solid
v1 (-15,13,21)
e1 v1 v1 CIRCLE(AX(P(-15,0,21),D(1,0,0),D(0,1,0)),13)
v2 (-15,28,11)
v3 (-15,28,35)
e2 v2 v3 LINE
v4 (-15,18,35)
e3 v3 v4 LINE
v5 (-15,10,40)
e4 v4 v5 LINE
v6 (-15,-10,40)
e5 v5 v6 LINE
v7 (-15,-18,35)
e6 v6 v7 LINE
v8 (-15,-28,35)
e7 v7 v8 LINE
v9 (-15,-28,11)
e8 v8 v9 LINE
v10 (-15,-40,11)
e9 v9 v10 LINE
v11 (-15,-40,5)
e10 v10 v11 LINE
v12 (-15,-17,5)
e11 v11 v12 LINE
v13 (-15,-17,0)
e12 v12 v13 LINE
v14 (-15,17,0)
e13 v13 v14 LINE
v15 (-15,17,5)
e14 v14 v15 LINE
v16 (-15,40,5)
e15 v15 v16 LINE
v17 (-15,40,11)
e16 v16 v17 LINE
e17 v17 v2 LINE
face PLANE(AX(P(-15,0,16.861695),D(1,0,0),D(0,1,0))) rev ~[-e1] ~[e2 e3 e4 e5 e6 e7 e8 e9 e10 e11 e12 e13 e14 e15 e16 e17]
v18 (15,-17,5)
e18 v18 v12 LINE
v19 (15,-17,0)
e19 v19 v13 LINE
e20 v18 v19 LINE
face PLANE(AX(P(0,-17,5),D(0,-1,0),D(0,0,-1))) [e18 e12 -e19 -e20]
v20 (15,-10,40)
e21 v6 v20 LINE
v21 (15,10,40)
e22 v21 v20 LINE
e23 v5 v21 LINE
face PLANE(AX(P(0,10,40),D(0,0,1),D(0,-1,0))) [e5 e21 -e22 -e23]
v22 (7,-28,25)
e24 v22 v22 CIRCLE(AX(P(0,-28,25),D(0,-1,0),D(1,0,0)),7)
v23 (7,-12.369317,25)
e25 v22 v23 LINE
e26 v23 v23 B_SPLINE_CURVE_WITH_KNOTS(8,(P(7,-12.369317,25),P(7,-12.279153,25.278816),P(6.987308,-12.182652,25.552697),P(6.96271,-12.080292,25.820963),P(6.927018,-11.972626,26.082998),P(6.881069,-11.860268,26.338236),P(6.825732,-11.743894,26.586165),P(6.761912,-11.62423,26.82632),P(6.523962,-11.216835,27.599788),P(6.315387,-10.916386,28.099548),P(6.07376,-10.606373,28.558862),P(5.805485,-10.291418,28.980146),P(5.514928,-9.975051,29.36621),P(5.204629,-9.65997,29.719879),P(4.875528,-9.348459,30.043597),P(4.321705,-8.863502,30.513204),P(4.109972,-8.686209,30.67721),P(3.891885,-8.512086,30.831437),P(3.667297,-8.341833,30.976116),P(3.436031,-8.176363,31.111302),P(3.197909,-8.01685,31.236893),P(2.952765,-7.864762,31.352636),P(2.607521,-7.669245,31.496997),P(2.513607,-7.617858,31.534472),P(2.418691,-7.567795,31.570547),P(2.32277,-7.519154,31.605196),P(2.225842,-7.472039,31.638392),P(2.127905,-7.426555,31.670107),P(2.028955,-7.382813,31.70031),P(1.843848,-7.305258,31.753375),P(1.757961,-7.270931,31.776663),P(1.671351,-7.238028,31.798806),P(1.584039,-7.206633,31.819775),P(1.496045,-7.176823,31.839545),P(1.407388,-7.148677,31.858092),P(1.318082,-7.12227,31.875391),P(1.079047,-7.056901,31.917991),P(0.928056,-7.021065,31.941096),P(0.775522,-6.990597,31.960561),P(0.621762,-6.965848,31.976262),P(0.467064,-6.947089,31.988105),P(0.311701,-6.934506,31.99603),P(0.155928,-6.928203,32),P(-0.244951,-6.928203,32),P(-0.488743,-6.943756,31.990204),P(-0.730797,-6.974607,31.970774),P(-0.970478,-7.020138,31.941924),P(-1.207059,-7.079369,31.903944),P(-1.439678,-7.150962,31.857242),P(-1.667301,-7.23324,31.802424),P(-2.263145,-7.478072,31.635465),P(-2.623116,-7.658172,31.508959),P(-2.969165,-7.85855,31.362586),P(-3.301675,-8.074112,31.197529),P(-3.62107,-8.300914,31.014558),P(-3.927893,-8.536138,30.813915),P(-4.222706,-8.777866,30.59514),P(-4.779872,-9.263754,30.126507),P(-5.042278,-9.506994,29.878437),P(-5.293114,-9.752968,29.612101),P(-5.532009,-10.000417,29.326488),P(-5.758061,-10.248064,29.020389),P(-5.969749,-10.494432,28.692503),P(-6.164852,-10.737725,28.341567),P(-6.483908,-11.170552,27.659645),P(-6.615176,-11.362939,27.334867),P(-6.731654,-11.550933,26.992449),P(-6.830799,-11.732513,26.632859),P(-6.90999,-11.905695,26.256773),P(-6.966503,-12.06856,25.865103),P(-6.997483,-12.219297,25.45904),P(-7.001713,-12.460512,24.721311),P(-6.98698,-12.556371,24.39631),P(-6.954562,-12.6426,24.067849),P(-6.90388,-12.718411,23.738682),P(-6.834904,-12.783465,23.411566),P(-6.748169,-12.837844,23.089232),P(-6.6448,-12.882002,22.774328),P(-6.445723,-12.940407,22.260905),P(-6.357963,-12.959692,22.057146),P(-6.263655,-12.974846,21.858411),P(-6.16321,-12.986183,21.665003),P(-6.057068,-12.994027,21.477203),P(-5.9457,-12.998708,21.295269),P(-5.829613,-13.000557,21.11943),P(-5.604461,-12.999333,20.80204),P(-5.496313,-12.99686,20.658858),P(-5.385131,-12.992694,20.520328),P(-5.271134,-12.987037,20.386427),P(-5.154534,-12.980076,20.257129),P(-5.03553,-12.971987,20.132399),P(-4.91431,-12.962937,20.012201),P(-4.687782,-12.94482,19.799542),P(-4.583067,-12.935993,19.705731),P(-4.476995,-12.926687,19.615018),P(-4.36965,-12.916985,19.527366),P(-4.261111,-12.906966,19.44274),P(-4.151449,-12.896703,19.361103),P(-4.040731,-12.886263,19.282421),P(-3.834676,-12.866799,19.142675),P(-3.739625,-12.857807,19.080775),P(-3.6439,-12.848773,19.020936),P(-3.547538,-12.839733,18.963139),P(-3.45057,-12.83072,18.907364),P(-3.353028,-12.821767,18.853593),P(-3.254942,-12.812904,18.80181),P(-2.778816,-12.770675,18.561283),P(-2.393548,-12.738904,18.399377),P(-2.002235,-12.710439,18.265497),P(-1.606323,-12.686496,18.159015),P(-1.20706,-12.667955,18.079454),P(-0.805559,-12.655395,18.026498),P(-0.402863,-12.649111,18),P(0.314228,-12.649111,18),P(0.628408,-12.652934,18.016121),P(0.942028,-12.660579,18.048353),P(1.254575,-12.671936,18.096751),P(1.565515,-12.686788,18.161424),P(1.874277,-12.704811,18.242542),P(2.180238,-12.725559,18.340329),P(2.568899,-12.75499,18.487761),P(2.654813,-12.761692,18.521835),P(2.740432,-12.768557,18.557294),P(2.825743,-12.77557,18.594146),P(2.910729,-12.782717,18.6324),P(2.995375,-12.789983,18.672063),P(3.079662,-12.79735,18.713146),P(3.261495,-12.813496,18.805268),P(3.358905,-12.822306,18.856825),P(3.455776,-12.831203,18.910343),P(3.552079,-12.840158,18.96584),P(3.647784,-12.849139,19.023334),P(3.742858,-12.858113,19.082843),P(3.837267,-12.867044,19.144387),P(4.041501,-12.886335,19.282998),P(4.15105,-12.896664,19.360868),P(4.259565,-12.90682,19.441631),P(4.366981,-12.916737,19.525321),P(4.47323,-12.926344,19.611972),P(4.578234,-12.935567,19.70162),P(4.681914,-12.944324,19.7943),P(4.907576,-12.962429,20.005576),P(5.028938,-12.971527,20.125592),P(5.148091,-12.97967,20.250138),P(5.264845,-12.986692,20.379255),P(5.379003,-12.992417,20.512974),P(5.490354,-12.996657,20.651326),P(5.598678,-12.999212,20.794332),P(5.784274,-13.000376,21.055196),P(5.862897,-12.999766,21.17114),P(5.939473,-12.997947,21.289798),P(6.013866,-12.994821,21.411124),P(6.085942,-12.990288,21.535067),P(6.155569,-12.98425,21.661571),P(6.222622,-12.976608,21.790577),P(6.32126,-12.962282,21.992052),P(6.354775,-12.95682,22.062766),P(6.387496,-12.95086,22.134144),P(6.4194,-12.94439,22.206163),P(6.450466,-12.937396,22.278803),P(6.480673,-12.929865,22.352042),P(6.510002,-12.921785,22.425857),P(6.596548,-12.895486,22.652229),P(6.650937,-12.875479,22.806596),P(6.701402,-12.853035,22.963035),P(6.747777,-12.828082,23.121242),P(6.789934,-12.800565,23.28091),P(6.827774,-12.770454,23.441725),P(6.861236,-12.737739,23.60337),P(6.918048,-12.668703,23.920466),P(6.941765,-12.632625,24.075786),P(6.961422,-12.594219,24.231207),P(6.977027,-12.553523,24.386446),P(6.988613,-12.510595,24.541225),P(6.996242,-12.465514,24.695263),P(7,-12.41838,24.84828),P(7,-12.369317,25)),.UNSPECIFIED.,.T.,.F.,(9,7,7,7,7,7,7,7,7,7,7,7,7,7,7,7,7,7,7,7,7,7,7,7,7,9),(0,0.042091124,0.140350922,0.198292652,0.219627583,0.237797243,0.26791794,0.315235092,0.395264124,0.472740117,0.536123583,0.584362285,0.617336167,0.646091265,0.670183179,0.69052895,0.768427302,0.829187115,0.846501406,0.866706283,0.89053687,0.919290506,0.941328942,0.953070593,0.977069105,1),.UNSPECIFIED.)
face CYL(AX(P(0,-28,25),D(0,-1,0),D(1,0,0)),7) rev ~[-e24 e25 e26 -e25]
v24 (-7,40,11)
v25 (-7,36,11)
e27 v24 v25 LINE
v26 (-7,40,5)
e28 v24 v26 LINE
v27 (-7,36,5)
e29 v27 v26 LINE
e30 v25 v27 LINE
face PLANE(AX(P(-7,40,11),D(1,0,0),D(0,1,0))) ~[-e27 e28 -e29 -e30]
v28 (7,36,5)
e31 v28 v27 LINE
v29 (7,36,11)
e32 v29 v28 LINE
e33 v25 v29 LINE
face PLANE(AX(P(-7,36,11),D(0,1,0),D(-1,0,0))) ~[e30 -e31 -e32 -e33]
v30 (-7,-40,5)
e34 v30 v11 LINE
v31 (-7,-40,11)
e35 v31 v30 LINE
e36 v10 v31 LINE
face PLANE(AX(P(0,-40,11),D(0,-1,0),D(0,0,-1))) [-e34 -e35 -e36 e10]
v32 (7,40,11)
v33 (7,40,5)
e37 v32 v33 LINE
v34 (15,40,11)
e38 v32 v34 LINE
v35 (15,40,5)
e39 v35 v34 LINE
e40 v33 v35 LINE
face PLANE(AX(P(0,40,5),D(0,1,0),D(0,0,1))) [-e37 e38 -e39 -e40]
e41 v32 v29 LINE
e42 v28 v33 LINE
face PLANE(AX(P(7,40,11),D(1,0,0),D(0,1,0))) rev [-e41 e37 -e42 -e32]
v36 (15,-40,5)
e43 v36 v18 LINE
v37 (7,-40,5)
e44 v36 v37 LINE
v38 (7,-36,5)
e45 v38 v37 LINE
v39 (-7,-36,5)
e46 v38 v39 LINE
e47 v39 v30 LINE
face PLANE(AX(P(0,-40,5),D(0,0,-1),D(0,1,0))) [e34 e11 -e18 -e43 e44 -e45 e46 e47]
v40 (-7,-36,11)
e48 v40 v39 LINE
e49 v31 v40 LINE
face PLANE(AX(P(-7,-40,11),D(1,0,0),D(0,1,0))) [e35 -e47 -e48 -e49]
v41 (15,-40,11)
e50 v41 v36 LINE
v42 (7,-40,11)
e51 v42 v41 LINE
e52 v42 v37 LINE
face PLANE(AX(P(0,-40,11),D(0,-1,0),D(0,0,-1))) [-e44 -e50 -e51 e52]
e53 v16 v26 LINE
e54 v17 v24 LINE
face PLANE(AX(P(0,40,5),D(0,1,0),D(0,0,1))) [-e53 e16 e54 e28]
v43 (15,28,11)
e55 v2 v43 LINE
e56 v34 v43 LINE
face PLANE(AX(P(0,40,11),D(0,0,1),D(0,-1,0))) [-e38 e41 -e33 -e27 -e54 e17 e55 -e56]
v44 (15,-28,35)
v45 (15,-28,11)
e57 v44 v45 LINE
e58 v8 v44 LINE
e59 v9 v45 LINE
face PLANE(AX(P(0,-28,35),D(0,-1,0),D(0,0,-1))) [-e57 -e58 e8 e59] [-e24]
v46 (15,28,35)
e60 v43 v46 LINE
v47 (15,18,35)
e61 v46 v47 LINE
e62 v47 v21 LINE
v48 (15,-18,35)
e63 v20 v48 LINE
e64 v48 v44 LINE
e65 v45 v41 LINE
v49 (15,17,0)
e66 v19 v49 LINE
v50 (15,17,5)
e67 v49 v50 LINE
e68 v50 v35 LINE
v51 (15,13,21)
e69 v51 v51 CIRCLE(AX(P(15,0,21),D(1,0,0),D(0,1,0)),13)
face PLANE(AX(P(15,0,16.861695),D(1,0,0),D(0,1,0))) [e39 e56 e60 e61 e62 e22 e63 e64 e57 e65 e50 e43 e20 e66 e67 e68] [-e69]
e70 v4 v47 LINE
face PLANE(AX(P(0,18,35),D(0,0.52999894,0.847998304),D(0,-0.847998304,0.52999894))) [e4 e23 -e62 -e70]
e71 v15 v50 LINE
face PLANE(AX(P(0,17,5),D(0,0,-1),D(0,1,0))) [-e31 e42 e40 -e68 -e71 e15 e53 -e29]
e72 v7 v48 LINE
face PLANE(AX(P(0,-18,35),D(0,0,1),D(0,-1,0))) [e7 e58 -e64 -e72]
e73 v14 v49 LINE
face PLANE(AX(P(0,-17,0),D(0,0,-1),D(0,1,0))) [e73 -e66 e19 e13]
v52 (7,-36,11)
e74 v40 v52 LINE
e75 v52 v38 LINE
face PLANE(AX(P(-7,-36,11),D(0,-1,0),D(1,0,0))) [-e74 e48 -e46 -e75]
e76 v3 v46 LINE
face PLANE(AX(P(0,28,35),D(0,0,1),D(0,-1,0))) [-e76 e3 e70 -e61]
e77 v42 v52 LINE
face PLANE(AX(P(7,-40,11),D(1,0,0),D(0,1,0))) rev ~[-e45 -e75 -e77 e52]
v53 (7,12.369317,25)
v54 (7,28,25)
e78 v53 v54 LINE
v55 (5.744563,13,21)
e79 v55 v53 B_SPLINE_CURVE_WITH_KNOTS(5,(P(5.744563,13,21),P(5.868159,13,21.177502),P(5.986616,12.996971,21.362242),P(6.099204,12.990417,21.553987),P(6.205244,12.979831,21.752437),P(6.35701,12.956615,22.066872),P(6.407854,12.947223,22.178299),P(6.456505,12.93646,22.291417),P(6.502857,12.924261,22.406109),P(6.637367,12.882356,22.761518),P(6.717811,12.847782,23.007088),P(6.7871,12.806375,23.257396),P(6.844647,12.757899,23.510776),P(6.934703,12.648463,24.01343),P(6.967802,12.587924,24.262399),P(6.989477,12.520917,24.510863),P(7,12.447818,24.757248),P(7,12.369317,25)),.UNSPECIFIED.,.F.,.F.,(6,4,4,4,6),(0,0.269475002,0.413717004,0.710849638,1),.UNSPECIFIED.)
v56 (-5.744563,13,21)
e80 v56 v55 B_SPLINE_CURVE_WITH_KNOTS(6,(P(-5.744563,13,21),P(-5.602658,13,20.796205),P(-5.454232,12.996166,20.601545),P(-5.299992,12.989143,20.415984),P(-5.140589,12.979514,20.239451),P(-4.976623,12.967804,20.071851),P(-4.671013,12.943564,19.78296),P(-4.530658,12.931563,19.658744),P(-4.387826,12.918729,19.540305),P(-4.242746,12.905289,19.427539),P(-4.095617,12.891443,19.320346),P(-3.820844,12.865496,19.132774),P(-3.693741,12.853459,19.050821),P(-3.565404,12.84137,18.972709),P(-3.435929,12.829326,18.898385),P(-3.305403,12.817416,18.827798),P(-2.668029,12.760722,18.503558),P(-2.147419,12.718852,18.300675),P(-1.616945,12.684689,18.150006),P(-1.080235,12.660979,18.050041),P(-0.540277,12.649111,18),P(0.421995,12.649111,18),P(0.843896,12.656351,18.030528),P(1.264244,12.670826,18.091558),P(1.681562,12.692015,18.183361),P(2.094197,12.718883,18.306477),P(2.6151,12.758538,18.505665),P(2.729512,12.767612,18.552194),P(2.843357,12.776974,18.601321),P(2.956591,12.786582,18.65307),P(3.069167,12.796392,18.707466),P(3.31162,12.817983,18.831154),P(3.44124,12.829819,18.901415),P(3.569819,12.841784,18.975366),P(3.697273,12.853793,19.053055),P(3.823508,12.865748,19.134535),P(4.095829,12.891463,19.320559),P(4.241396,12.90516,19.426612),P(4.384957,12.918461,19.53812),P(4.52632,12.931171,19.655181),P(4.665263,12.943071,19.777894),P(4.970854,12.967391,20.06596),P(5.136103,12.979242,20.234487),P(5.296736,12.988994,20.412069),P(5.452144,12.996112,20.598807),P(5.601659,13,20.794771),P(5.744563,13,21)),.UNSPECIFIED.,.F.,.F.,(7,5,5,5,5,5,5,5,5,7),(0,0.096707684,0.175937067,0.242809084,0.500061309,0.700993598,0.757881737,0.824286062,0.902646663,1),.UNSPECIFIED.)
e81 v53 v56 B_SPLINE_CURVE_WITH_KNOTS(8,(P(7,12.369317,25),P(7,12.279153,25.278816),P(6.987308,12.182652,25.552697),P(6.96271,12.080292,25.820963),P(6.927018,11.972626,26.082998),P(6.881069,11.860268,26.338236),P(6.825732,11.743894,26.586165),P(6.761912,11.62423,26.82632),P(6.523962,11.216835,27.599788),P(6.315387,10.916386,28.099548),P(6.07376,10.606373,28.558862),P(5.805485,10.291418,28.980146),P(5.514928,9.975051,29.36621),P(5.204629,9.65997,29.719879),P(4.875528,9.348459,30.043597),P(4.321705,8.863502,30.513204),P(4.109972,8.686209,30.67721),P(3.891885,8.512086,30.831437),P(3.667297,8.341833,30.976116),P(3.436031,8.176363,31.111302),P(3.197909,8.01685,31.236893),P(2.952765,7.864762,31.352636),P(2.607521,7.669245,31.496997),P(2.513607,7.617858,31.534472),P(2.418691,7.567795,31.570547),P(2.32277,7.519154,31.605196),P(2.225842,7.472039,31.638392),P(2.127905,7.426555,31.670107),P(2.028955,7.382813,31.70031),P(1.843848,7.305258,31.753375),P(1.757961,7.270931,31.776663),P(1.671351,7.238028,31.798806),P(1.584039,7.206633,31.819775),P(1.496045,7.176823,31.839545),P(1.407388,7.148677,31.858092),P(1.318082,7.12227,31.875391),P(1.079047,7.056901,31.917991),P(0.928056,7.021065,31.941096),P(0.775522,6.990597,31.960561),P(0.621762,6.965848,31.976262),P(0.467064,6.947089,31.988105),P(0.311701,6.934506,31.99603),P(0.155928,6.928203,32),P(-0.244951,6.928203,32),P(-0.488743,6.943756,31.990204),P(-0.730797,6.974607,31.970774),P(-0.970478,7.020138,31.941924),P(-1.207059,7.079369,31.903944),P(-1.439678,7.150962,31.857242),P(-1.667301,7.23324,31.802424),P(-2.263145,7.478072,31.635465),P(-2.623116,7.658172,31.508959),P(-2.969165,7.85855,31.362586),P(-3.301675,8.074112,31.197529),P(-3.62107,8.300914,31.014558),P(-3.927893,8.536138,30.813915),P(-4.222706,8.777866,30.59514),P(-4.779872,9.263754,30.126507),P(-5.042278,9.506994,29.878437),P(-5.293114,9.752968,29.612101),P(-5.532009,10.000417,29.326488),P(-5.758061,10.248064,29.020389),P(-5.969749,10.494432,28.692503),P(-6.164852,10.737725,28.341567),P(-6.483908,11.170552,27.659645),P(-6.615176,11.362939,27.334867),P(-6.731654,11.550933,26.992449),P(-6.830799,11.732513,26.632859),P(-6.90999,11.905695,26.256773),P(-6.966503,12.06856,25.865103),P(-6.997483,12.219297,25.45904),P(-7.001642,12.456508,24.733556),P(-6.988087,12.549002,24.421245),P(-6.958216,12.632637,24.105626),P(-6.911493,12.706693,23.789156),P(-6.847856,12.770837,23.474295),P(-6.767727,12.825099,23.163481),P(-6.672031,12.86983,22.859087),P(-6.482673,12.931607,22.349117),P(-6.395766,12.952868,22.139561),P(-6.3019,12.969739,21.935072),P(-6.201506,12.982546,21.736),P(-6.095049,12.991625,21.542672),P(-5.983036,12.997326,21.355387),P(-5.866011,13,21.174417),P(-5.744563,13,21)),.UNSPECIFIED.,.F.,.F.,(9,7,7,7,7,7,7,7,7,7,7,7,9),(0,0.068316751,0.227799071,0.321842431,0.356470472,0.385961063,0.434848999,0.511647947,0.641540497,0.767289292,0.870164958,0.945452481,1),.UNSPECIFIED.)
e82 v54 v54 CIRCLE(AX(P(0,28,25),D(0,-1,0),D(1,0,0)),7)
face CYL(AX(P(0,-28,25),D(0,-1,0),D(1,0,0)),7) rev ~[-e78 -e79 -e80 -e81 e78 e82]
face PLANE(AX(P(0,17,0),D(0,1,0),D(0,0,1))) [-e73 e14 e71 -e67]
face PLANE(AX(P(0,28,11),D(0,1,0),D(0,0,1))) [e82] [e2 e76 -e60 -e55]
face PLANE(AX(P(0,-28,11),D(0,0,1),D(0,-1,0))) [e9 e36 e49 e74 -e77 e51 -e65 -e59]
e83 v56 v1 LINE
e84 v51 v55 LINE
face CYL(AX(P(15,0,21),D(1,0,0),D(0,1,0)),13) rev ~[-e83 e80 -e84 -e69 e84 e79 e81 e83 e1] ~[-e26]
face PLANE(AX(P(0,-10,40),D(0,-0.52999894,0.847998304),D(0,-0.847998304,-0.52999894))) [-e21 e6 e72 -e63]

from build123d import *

# Parameters (mm, degrees)
F1_DEPTH = 15
F2_R     = 13
F3_DEPTH = 30.001
F4_W     = 14
F4_H     = 4
F5_DEPTH = 11.001
F6_R     = 7
F7_DEPTH = 68.001


# Not quite as in the source:
# - a pattern or mirror of a feature is missing from the dataset's text; its kind, count and spacing are read off the source's solid


with BuildPart() as f1:
    # F0 (on Right) → F1 (new body, symmetric)
    with BuildSketch(Plane.YZ):
        Polygon((-17, 0), (0, 0), (17, 0), (17, 5), (40, 5), (40, 11), (28, 11), (28, 35), (18, 35), (10, 40), (0, 40), (-10, 40), (-18, 35), (-28, 35), (-28, 11), (-40, 11), (-40, 5), (-17, 5), align=None)
    extrude(amount=F1_DEPTH, both=True)

    # F2 (on face) → F3 (cut, through all)
    with BuildSketch(Plane.YZ.offset(15)):
        with Locations((0, 21)):
            Circle(F2_R)
    extrude(amount=-F3_DEPTH, mode=Mode.SUBTRACT)

    # F4 (on face) → F5 (cut, through all)
    with BuildSketch(Plane.XY.offset(11)):
        with Locations((0, -38)):
            Rectangle(F4_W, F4_H)
    f5 = extrude(amount=-F5_DEPTH, mode=Mode.SUBTRACT)

    # F5_copies: F5 across plane
    add(f5.mirror(Plane.ZX), mode=Mode.SUBTRACT)

    # F6 (on face) → F7 (cut, through all)
    with BuildSketch(Plane.XZ.offset(28)):
        with Locations((0, 25)):
            Circle(F6_R)
    extrude(amount=-F7_DEPTH, mode=Mode.SUBTRACT)


solid = f1.part
